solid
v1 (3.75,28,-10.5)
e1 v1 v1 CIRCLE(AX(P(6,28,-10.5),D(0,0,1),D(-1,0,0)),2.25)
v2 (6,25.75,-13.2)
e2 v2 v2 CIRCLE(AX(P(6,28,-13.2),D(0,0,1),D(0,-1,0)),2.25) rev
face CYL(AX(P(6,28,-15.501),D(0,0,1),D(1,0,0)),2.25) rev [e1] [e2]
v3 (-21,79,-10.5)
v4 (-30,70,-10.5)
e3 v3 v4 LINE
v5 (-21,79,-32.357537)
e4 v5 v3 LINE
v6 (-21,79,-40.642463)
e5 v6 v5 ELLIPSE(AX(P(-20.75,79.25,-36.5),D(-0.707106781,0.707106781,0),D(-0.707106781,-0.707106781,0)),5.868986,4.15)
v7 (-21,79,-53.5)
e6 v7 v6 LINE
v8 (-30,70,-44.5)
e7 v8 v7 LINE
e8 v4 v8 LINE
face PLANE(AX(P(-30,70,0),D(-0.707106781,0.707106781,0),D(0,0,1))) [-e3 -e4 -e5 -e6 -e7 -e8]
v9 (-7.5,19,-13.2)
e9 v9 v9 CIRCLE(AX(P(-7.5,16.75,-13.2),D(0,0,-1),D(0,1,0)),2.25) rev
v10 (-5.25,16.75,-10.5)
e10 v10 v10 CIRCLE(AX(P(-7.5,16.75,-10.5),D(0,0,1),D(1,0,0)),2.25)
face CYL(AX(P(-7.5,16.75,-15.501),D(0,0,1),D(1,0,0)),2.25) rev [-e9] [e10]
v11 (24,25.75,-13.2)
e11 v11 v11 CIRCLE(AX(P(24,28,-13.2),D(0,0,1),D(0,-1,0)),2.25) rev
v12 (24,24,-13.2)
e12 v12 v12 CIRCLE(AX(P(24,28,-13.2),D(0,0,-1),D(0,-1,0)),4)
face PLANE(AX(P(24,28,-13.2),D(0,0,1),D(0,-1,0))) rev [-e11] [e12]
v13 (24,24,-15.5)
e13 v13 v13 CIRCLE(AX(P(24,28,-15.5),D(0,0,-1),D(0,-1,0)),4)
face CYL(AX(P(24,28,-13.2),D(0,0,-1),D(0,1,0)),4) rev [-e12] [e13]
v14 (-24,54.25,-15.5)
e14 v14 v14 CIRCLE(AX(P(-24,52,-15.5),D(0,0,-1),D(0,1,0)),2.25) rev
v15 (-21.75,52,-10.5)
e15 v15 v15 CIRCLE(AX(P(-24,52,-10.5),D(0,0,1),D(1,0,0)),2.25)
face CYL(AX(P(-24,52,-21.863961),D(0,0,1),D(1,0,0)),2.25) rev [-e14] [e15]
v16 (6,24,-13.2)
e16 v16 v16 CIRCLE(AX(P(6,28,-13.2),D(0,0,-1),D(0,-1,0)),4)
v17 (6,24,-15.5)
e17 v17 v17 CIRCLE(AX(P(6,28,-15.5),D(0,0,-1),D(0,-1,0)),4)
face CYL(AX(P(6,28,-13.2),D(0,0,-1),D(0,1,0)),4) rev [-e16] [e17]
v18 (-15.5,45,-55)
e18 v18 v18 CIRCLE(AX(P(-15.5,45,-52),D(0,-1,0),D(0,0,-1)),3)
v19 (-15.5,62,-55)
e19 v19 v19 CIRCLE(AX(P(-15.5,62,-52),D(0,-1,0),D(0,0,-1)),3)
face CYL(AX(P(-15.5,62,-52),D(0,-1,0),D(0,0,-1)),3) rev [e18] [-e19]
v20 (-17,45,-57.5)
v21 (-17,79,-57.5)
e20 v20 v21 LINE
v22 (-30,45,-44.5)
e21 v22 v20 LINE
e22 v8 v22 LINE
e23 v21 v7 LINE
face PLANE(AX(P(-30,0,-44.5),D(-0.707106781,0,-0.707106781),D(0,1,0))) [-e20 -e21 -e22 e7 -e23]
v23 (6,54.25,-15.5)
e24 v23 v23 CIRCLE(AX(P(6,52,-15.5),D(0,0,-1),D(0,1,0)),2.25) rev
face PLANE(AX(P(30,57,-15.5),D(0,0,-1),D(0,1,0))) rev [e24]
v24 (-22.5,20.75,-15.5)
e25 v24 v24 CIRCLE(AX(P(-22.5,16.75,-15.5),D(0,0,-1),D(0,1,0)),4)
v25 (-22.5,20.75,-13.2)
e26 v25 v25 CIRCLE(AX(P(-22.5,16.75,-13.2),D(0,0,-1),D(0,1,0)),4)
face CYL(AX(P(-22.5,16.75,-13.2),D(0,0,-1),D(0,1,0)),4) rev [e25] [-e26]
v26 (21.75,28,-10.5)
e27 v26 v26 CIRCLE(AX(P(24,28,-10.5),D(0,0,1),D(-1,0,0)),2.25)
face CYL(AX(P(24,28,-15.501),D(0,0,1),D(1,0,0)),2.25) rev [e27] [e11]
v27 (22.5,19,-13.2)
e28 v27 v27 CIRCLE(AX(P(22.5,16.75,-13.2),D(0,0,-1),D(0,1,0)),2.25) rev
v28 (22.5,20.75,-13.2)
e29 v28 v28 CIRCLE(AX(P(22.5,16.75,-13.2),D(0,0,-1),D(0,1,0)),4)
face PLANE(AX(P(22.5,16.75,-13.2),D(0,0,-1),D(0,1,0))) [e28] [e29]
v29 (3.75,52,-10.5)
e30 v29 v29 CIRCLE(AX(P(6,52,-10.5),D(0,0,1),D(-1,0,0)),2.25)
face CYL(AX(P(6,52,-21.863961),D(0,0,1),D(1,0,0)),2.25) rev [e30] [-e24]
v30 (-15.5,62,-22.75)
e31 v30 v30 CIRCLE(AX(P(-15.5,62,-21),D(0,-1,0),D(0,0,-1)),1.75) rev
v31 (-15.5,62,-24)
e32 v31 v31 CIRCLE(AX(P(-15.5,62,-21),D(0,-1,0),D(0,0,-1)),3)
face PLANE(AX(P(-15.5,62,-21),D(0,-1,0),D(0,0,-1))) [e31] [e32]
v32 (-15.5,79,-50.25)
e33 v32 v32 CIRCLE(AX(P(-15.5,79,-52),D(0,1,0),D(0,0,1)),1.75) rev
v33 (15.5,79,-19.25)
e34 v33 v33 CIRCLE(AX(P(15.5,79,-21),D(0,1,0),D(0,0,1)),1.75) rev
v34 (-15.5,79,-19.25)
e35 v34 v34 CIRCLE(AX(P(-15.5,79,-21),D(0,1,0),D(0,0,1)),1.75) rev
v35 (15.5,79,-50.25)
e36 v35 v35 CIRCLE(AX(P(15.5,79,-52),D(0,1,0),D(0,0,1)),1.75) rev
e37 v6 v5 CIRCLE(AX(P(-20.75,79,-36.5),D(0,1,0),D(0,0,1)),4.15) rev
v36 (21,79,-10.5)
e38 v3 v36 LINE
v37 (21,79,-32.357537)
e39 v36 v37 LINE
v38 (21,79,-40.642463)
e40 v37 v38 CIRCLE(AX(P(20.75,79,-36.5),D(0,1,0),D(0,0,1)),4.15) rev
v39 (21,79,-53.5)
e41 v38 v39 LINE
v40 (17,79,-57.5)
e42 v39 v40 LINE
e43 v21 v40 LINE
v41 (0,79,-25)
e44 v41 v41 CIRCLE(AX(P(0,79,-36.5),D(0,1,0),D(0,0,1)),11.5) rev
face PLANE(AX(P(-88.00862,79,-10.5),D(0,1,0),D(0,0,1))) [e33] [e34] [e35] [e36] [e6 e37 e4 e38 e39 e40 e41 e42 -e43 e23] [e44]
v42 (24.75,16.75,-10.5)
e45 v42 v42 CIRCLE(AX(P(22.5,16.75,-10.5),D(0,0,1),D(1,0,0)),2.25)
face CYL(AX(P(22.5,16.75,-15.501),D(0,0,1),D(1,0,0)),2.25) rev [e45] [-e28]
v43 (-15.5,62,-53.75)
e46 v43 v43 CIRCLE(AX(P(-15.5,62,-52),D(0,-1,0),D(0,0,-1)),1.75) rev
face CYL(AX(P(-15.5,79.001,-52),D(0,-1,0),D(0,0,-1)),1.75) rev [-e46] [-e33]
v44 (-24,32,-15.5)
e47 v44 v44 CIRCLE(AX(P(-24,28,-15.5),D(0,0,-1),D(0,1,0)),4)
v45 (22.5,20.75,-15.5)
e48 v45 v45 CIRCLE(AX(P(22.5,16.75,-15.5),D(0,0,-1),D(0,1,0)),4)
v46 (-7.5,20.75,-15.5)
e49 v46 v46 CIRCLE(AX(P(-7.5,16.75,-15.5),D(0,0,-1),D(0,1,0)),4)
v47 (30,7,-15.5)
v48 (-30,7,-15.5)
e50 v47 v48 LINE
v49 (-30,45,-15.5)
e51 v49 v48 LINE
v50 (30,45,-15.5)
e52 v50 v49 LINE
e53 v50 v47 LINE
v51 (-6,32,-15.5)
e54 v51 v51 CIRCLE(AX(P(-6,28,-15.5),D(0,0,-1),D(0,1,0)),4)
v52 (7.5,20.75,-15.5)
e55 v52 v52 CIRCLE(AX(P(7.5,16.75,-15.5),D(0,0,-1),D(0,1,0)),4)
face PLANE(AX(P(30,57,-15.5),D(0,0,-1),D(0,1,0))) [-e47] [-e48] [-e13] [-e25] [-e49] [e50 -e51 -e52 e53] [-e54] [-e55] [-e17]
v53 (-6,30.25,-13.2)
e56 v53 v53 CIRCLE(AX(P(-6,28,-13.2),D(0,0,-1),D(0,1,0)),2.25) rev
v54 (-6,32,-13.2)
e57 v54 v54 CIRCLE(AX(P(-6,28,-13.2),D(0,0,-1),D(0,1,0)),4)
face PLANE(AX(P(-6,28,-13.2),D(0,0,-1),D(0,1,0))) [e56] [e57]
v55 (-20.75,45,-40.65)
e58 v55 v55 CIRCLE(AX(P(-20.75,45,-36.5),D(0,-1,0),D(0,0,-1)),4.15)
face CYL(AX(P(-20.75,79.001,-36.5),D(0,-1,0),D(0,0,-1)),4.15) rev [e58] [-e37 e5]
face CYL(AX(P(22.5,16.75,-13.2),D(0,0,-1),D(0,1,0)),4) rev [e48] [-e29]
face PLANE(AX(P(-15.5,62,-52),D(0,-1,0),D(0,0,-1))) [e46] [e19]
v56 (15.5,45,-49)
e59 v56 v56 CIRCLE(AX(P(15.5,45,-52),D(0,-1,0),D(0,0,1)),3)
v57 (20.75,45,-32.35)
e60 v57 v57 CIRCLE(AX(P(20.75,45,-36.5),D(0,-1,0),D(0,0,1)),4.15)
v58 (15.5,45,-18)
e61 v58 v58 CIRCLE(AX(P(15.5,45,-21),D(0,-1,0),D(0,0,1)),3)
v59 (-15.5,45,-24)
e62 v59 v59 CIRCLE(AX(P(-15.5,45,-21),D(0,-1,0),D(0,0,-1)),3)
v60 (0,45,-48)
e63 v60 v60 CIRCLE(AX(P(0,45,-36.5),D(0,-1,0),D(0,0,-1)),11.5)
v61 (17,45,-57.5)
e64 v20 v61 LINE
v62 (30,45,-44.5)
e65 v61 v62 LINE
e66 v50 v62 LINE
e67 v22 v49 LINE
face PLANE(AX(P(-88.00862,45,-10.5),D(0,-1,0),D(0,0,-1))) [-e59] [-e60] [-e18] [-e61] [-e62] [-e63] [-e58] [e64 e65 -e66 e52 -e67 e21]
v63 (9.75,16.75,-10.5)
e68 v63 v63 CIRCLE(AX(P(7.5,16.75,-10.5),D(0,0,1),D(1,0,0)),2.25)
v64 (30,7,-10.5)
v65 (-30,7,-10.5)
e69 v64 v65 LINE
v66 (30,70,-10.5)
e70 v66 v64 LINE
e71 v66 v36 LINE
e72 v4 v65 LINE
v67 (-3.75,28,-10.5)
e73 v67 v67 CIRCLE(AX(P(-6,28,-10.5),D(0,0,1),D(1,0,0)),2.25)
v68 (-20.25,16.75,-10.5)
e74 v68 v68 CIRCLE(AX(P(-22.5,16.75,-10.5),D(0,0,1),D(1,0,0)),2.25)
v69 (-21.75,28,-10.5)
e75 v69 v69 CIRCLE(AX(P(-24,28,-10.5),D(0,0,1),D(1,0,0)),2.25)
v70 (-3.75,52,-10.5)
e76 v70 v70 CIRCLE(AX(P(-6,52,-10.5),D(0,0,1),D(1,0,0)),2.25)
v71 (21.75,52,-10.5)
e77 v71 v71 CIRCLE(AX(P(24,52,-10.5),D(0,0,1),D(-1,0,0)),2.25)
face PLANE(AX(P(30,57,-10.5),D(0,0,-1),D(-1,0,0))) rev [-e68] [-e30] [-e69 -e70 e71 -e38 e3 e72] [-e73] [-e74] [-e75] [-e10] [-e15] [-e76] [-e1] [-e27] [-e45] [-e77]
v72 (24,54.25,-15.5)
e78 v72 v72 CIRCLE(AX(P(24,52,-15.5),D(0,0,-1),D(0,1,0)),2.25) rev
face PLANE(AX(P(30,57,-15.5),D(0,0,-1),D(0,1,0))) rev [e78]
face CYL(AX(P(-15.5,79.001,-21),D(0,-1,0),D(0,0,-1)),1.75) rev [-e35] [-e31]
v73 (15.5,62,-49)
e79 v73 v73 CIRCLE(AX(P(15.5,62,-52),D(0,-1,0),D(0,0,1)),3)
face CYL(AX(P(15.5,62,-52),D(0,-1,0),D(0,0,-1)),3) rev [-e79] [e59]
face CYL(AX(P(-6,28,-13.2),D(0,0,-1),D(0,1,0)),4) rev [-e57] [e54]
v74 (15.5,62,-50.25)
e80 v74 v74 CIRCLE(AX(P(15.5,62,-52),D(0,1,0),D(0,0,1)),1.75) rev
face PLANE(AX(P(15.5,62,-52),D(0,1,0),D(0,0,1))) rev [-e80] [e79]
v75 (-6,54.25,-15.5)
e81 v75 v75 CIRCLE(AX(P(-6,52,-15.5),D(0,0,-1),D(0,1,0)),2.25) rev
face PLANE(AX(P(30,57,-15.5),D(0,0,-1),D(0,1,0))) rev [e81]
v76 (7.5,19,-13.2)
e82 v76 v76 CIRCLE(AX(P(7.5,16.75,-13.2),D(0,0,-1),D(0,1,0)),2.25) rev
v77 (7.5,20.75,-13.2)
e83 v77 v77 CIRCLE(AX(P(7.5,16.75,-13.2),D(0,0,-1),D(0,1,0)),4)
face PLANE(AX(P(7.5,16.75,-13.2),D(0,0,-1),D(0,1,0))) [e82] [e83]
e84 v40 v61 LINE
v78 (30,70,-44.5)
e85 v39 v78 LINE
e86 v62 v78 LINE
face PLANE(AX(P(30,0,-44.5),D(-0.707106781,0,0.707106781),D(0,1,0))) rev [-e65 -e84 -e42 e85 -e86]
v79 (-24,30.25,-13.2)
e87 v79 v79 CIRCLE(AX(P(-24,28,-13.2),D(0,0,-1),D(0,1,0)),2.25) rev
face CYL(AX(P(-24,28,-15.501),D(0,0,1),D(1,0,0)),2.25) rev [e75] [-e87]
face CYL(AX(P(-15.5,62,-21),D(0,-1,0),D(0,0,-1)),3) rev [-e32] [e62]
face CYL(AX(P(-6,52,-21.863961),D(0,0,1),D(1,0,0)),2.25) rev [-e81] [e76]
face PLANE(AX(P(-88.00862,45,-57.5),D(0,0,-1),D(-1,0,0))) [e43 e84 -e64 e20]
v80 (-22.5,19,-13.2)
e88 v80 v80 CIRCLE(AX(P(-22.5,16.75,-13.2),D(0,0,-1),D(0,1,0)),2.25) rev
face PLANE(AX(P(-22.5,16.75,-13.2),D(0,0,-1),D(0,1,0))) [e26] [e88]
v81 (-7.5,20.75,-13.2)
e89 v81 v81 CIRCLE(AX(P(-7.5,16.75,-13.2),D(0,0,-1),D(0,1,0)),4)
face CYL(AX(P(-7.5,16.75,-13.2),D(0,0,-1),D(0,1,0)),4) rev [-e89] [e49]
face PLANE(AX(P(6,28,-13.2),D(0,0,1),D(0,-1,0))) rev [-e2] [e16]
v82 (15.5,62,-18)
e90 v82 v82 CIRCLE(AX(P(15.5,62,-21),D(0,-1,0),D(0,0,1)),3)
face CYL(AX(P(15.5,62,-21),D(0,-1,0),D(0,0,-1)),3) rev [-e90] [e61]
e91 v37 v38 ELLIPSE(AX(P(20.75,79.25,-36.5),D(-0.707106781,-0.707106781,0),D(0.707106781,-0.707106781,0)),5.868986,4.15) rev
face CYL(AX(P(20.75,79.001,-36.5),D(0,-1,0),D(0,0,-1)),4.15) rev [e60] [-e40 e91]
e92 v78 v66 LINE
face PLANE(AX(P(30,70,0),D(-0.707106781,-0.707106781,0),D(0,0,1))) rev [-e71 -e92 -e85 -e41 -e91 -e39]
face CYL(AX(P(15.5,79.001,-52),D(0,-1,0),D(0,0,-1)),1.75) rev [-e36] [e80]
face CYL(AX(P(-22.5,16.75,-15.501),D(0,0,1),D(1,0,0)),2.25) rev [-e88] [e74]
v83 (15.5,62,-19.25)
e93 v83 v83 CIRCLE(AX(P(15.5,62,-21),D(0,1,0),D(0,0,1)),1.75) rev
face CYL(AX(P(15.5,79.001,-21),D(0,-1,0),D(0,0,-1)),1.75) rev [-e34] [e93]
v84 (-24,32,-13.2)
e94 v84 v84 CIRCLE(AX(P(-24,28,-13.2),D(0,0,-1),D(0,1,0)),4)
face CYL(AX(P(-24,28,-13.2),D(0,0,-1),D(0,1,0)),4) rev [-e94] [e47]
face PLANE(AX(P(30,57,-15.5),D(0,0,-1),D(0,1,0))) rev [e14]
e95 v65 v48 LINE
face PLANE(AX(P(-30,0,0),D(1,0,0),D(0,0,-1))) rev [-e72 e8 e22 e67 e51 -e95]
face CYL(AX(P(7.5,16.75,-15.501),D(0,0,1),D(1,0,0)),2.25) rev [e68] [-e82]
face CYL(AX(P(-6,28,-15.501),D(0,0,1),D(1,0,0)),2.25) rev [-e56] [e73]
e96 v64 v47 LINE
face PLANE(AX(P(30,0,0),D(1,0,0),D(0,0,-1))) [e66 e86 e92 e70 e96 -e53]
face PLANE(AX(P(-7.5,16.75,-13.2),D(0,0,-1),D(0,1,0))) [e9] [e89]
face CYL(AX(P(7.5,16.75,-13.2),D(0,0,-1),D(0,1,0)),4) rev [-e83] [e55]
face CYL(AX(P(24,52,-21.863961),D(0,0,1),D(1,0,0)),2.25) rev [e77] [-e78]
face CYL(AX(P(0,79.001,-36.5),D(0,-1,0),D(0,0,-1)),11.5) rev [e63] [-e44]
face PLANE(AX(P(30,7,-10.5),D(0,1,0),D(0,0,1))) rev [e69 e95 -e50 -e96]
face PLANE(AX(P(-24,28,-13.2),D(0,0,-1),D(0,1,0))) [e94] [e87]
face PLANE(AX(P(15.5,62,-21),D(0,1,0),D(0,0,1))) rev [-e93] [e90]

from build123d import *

# Parameters (mm, degrees)
SKETCH2_W           = 5
SKETCH2_H           = 50
BOSS_EXTRUDE1_DEPTH = 30
CUT_EXTRUDE1_REACH  = 66.607
SKETCH3_R           = 2.25
SKETCH6_W           = 47
SKETCH6_H           = 34
BOSS_EXTRUDE3_DEPTH = 60
SKETCH7_R           = 4
CUT_EXTRUDE2_DEPTH  = 2.3
CUT_EXTRUDE3_REACH  = 77.168
SKETCH8_R           = 11.5
SKETCH8_R_2         = 4.15
SKETCH8_R_3         = 1.75
CHAMFER1_SIZE       = 13
SKETCH9_R           = 3
CUT_EXTRUDE4_DEPTH  = 17
CHAMFER2_SIZE       = 9
SKETCH3_2_R         = 2.25
CUT_EXTRUDE5_DEPTH  = 5


with BuildPart() as part:
    # Sketch2 → Boss-Extrude1 (new, symmetric)
    with BuildSketch(Plane(origin=(0, 0, 0), x_dir=(0, 0, -1), z_dir=(1, 0, 0))):
        with Locations((13, 32)):
            Rectangle(SKETCH2_W, SKETCH2_H)
    extrude(amount=BOSS_EXTRUDE1_DEPTH, both=True)

    # Sketch3 → Cut-Extrude1 (cut, up to next)
    with BuildSketch(Plane.XY.offset(-10.5), mode=Mode.PRIVATE) as cut_extrude1_sk1:
        with Locations((-22.5, 16.75)):
            Circle(SKETCH3_R)
    cut_extrude1_tool1 = extrude(cut_extrude1_sk1.sketch, amount=-CUT_EXTRUDE1_REACH, mode=Mode.PRIVATE) & part.part
    # Sketch3 → Cut-Extrude1 (cut, up to next)
    with BuildSketch(Plane.XY.offset(-10.5), mode=Mode.PRIVATE) as cut_extrude1_sk2:
        with Locations((-7.5, 16.75)):
            Circle(SKETCH3_R)
    cut_extrude1_tool2 = extrude(cut_extrude1_sk2.sketch, amount=-CUT_EXTRUDE1_REACH, mode=Mode.PRIVATE) & part.part
    # Sketch3 → Cut-Extrude1 (cut, up to next)
    with BuildSketch(Plane.XY.offset(-10.5), mode=Mode.PRIVATE) as cut_extrude1_sk3:
        with Locations((7.5, 16.75)):
            Circle(SKETCH3_R)
    cut_extrude1_tool3 = extrude(cut_extrude1_sk3.sketch, amount=-CUT_EXTRUDE1_REACH, mode=Mode.PRIVATE) & part.part
    # Sketch3 → Cut-Extrude1 (cut, up to next)
    with BuildSketch(Plane.XY.offset(-10.5), mode=Mode.PRIVATE) as cut_extrude1_sk4:
        with Locations((22.5, 16.75)):
            Circle(SKETCH3_R)
    cut_extrude1_tool4 = extrude(cut_extrude1_sk4.sketch, amount=-CUT_EXTRUDE1_REACH, mode=Mode.PRIVATE) & part.part
    # Sketch3 → Cut-Extrude1 (cut, up to next)
    with BuildSketch(Plane.XY.offset(-10.5), mode=Mode.PRIVATE) as cut_extrude1_sk5:
        with Locations((-24, 52)):
            Circle(SKETCH3_R)
    cut_extrude1_tool5 = extrude(cut_extrude1_sk5.sketch, amount=-CUT_EXTRUDE1_REACH, mode=Mode.PRIVATE) & part.part
    # Sketch3 → Cut-Extrude1 (cut, up to next)
    with BuildSketch(Plane.XY.offset(-10.5), mode=Mode.PRIVATE) as cut_extrude1_sk6:
        with Locations((-6, 52)):
            Circle(SKETCH3_R)
    cut_extrude1_tool6 = extrude(cut_extrude1_sk6.sketch, amount=-CUT_EXTRUDE1_REACH, mode=Mode.PRIVATE) & part.part
    # Sketch3 → Cut-Extrude1 (cut, up to next)
    with BuildSketch(Plane.XY.offset(-10.5), mode=Mode.PRIVATE) as cut_extrude1_sk7:
        with Locations((-24, 28)):
            Circle(SKETCH3_R)
    cut_extrude1_tool7 = extrude(cut_extrude1_sk7.sketch, amount=-CUT_EXTRUDE1_REACH, mode=Mode.PRIVATE) & part.part
    # Sketch3 → Cut-Extrude1 (cut, up to next)
    with BuildSketch(Plane.XY.offset(-10.5), mode=Mode.PRIVATE) as cut_extrude1_sk8:
        with Locations((-6, 28)):
            Circle(SKETCH3_R)
    cut_extrude1_tool8 = extrude(cut_extrude1_sk8.sketch, amount=-CUT_EXTRUDE1_REACH, mode=Mode.PRIVATE) & part.part
    # Sketch3 → Cut-Extrude1 (cut, up to next)
    with BuildSketch(Plane.XY.offset(-10.5), mode=Mode.PRIVATE) as cut_extrude1_sk9:
        with Locations(Location((6, 28, 0), (0, 0, 90))):
            Circle(SKETCH3_R)
    cut_extrude1_tool9 = extrude(cut_extrude1_sk9.sketch, amount=-CUT_EXTRUDE1_REACH, mode=Mode.PRIVATE) & part.part
    # Sketch3 → Cut-Extrude1 (cut, up to next)
    with BuildSketch(Plane.XY.offset(-10.5), mode=Mode.PRIVATE) as cut_extrude1_sk10:
        with Locations(Location((24, 28, 0), (0, 0, 90))):
            Circle(SKETCH3_R)
    cut_extrude1_tool10 = extrude(cut_extrude1_sk10.sketch, amount=-CUT_EXTRUDE1_REACH, mode=Mode.PRIVATE) & part.part
    # Sketch3 → Cut-Extrude1 (cut, up to next)
    with BuildSketch(Plane.XY.offset(-10.5), mode=Mode.PRIVATE) as cut_extrude1_sk11:
        with Locations(Location((6, 52, 0), (0, 0, 90))):
            Circle(SKETCH3_R)
    cut_extrude1_tool11 = extrude(cut_extrude1_sk11.sketch, amount=-CUT_EXTRUDE1_REACH, mode=Mode.PRIVATE) & part.part
    # Sketch3 → Cut-Extrude1 (cut, up to next)
    with BuildSketch(Plane.XY.offset(-10.5), mode=Mode.PRIVATE) as cut_extrude1_sk12:
        with Locations(Location((24, 52, 0), (0, 0, 90))):
            Circle(SKETCH3_R)
    cut_extrude1_tool12 = extrude(cut_extrude1_sk12.sketch, amount=-CUT_EXTRUDE1_REACH, mode=Mode.PRIVATE) & part.part
    add(cut_extrude1_tool1.solids().sort_by_distance((-22.5, 16.75, -10.5))[0], mode=Mode.SUBTRACT)
    add(cut_extrude1_tool2.solids().sort_by_distance((-7.5, 16.75, -10.5))[0], mode=Mode.SUBTRACT)
    add(cut_extrude1_tool3.solids().sort_by_distance((7.5, 16.75, -10.5))[0], mode=Mode.SUBTRACT)
    add(cut_extrude1_tool4.solids().sort_by_distance((22.5, 16.75, -10.5))[0], mode=Mode.SUBTRACT)
    add(cut_extrude1_tool5.solids().sort_by_distance((-24, 52, -10.5))[0], mode=Mode.SUBTRACT)
    add(cut_extrude1_tool6.solids().sort_by_distance((-6, 52, -10.5))[0], mode=Mode.SUBTRACT)
    add(cut_extrude1_tool7.solids().sort_by_distance((-24, 28, -10.5))[0], mode=Mode.SUBTRACT)
    add(cut_extrude1_tool8.solids().sort_by_distance((-6, 28, -10.5))[0], mode=Mode.SUBTRACT)
    add(cut_extrude1_tool9.solids().sort_by_distance((6, 28, -10.5))[0], mode=Mode.SUBTRACT)
    add(cut_extrude1_tool10.solids().sort_by_distance((24, 28, -10.5))[0], mode=Mode.SUBTRACT)
    add(cut_extrude1_tool11.solids().sort_by_distance((6, 52, -10.5))[0], mode=Mode.SUBTRACT)
    add(cut_extrude1_tool12.solids().sort_by_distance((24, 52, -10.5))[0], mode=Mode.SUBTRACT)

    # Sketch6 → Boss-Extrude3 (add)
    with BuildSketch(Plane(origin=(30, 0, 0), x_dir=(0, 0, -1), z_dir=(1, 0, 0))):
        with Locations((34, 62)):
            Rectangle(SKETCH6_W, SKETCH6_H)
    extrude(amount=-BOSS_EXTRUDE3_DEPTH)

    # Sketch7 → Cut-Extrude2 (cut)
    with BuildSketch(Plane(origin=(0, 0, -15.5), x_dir=(-1, 0, 0), z_dir=(0, 0, -1))):
        with Locations(Location((22.5, 16.75, 0), (0, 0, 90))):
            Circle(SKETCH7_R)
        with Locations(Location((24, 28, 0), (0, 0, 90))):
            Circle(SKETCH7_R)
        with Locations(Location((7.5, 16.75, 0), (0, 0, 90))):
            Circle(SKETCH7_R)
        with Locations(Location((-7.5, 16.75, 0), (0, 0, 90))):
            Circle(SKETCH7_R)
        with Locations(Location((-22.5, 16.75, 0), (0, 0, 90))):
            Circle(SKETCH7_R)
        with Locations(Location((6, 28, 0), (0, 0, 90))):
            Circle(SKETCH7_R)
        with Locations(Location((-6, 28, 0), (0, 0, 270))):
            Circle(SKETCH7_R)
        with Locations(Location((-24, 28, 0), (0, 0, 270))):
            Circle(SKETCH7_R)
    extrude(amount=-CUT_EXTRUDE2_DEPTH, mode=Mode.SUBTRACT)

    # Sketch8 → Cut-Extrude3 (cut, up to next)
    with BuildSketch(Plane.XZ.offset(-45), mode=Mode.PRIVATE) as cut_extrude3_sk1:
        with Locations(Location((0, -36.5, 0), (0, 0, 270))):
            Circle(SKETCH8_R)
    cut_extrude3_tool1 = extrude(cut_extrude3_sk1.sketch, amount=-CUT_EXTRUDE3_REACH, mode=Mode.PRIVATE) & part.part
    # Sketch8 → Cut-Extrude3 (cut, up to next)
    with BuildSketch(Plane.XZ.offset(-45), mode=Mode.PRIVATE) as cut_extrude3_sk2:
        with Locations(Location((-20.75, -36.5, 0), (0, 0, 270))):
            Circle(SKETCH8_R_2)
    cut_extrude3_tool2 = extrude(cut_extrude3_sk2.sketch, amount=-CUT_EXTRUDE3_REACH, mode=Mode.PRIVATE) & part.part
    # Sketch8 → Cut-Extrude3 (cut, up to next)
    with BuildSketch(Plane.XZ.offset(-45), mode=Mode.PRIVATE) as cut_extrude3_sk3:
        with Locations(Location((20.75, -36.5, 0), (0, 0, 90))):
            Circle(SKETCH8_R_2)
    cut_extrude3_tool3 = extrude(cut_extrude3_sk3.sketch, amount=-CUT_EXTRUDE3_REACH, mode=Mode.PRIVATE) & part.part
    # Sketch8 → Cut-Extrude3 (cut, up to next)
    with BuildSketch(Plane.XZ.offset(-45), mode=Mode.PRIVATE) as cut_extrude3_sk4:
        with Locations(Location((-15.5, -52, 0), (0, 0, 270))):
            Circle(SKETCH8_R_3)
    cut_extrude3_tool4 = extrude(cut_extrude3_sk4.sketch, amount=-CUT_EXTRUDE3_REACH, mode=Mode.PRIVATE) & part.part
    # Sketch8 → Cut-Extrude3 (cut, up to next)
    with BuildSketch(Plane.XZ.offset(-45), mode=Mode.PRIVATE) as cut_extrude3_sk5:
        with Locations(Location((15.5, -52, 0), (0, 0, 90))):
            Circle(SKETCH8_R_3)
    cut_extrude3_tool5 = extrude(cut_extrude3_sk5.sketch, amount=-CUT_EXTRUDE3_REACH, mode=Mode.PRIVATE) & part.part
    # Sketch8 → Cut-Extrude3 (cut, up to next)
    with BuildSketch(Plane.XZ.offset(-45), mode=Mode.PRIVATE) as cut_extrude3_sk6:
        with Locations(Location((15.5, -21, 0), (0, 0, 270))):
            Circle(SKETCH8_R_3)
    cut_extrude3_tool6 = extrude(cut_extrude3_sk6.sketch, amount=-CUT_EXTRUDE3_REACH, mode=Mode.PRIVATE) & part.part
    # Sketch8 → Cut-Extrude3 (cut, up to next)
    with BuildSketch(Plane.XZ.offset(-45), mode=Mode.PRIVATE) as cut_extrude3_sk7:
        with Locations(Location((-15.5, -21, 0), (0, 0, 90))):
            Circle(SKETCH8_R_3)
    cut_extrude3_tool7 = extrude(cut_extrude3_sk7.sketch, amount=-CUT_EXTRUDE3_REACH, mode=Mode.PRIVATE) & part.part
    add(cut_extrude3_tool1.solids().sort_by_distance((0, 45, -36.5))[0], mode=Mode.SUBTRACT)
    add(cut_extrude3_tool2.solids().sort_by_distance((-20.75, 45, -36.5))[0], mode=Mode.SUBTRACT)
    add(cut_extrude3_tool3.solids().sort_by_distance((20.75, 45, -36.5))[0], mode=Mode.SUBTRACT)
    add(cut_extrude3_tool4.solids().sort_by_distance((-15.5, 45, -52))[0], mode=Mode.SUBTRACT)
    add(cut_extrude3_tool5.solids().sort_by_distance((15.5, 45, -52))[0], mode=Mode.SUBTRACT)
    add(cut_extrude3_tool6.solids().sort_by_distance((15.5, 45, -21))[0], mode=Mode.SUBTRACT)
    add(cut_extrude3_tool7.solids().sort_by_distance((-15.5, 45, -21))[0], mode=Mode.SUBTRACT)

    # Chamfer1
    chamfer1_edges = [part.edges().sort_by_distance(p)[0] for p in [
        (30, 62, -57.5),
        (-30, 62, -57.5),
    ]]
    chamfer(chamfer1_edges, length=CHAMFER1_SIZE)

    # Sketch9 → Cut-Extrude4 (cut)
    with BuildSketch(Plane.XZ.offset(-45)):
        with Locations(Location((-15.5, -21, 0), (0, 0, 270))):
            Circle(SKETCH9_R)
        with Locations(Location((-15.5, -52, 0), (0, 0, 270))):
            Circle(SKETCH9_R)
        with Locations(Location((15.5, -52, 0), (0, 0, 90))):
            Circle(SKETCH9_R)
        with Locations(Location((15.5, -21, 0), (0, 0, 90))):
            Circle(SKETCH9_R)
    extrude(amount=-CUT_EXTRUDE4_DEPTH, mode=Mode.SUBTRACT)

    # Chamfer2
    # the kernel refuses this chamfer: 9 mm, written as the material it takes off along each edge
    with BuildSketch(Plane(origin=(30, 79, -67.645146892), x_dir=(-0.9996219169112966, 0.027495876610586775, 0), z_dir=(0, 0, 1)), Plane(origin=(-30, 79, -67.645146892), x_dir=(-0.027495876610586386, -0.9996219169112969, 0), z_dir=(0, 0, 1))) as chamfer2_piece_1:
        Polygon((CHAMFER2_SIZE * 0.999621916911, CHAMFER2_SIZE * 0.0274958766106), (-CHAMFER2_SIZE * 0.0274958766106, CHAMFER2_SIZE * 0.999621916911), (0, 0), align=None)
    extrude(amount=80.290293783, mode=Mode.SUBTRACT)

    # Sketch3<2> → Cut-Extrude5 (cut)
    with BuildSketch(Plane.XY.offset(-10.5)):
        with Locations((-22.5, 16.75)):
            Circle(SKETCH3_2_R)
        with Locations((-7.5, 16.75)):
            Circle(SKETCH3_2_R)
        with Locations((7.5, 16.75)):
            Circle(SKETCH3_2_R)
        with Locations((22.5, 16.75)):
            Circle(SKETCH3_2_R)
        with Locations((-24, 52)):
            Circle(SKETCH3_2_R)
        with Locations((-6, 52)):
            Circle(SKETCH3_2_R)
        with Locations((-24, 28)):
            Circle(SKETCH3_2_R)
        with Locations((-6, 28)):
            Circle(SKETCH3_2_R)
        with Locations(Location((6, 28, 0), (0, 0, 270))):
            Circle(SKETCH3_2_R)
        with Locations(Location((24, 28, 0), (0, 0, 270))):
            Circle(SKETCH3_2_R)
        with Locations(Location((6, 52, 0), (0, 0, 90))):
            Circle(SKETCH3_2_R)
        with Locations(Location((24, 52, 0), (0, 0, 90))):
            Circle(SKETCH3_2_R)
    extrude(amount=-CUT_EXTRUDE5_DEPTH, mode=Mode.SUBTRACT)


solid = part.part
